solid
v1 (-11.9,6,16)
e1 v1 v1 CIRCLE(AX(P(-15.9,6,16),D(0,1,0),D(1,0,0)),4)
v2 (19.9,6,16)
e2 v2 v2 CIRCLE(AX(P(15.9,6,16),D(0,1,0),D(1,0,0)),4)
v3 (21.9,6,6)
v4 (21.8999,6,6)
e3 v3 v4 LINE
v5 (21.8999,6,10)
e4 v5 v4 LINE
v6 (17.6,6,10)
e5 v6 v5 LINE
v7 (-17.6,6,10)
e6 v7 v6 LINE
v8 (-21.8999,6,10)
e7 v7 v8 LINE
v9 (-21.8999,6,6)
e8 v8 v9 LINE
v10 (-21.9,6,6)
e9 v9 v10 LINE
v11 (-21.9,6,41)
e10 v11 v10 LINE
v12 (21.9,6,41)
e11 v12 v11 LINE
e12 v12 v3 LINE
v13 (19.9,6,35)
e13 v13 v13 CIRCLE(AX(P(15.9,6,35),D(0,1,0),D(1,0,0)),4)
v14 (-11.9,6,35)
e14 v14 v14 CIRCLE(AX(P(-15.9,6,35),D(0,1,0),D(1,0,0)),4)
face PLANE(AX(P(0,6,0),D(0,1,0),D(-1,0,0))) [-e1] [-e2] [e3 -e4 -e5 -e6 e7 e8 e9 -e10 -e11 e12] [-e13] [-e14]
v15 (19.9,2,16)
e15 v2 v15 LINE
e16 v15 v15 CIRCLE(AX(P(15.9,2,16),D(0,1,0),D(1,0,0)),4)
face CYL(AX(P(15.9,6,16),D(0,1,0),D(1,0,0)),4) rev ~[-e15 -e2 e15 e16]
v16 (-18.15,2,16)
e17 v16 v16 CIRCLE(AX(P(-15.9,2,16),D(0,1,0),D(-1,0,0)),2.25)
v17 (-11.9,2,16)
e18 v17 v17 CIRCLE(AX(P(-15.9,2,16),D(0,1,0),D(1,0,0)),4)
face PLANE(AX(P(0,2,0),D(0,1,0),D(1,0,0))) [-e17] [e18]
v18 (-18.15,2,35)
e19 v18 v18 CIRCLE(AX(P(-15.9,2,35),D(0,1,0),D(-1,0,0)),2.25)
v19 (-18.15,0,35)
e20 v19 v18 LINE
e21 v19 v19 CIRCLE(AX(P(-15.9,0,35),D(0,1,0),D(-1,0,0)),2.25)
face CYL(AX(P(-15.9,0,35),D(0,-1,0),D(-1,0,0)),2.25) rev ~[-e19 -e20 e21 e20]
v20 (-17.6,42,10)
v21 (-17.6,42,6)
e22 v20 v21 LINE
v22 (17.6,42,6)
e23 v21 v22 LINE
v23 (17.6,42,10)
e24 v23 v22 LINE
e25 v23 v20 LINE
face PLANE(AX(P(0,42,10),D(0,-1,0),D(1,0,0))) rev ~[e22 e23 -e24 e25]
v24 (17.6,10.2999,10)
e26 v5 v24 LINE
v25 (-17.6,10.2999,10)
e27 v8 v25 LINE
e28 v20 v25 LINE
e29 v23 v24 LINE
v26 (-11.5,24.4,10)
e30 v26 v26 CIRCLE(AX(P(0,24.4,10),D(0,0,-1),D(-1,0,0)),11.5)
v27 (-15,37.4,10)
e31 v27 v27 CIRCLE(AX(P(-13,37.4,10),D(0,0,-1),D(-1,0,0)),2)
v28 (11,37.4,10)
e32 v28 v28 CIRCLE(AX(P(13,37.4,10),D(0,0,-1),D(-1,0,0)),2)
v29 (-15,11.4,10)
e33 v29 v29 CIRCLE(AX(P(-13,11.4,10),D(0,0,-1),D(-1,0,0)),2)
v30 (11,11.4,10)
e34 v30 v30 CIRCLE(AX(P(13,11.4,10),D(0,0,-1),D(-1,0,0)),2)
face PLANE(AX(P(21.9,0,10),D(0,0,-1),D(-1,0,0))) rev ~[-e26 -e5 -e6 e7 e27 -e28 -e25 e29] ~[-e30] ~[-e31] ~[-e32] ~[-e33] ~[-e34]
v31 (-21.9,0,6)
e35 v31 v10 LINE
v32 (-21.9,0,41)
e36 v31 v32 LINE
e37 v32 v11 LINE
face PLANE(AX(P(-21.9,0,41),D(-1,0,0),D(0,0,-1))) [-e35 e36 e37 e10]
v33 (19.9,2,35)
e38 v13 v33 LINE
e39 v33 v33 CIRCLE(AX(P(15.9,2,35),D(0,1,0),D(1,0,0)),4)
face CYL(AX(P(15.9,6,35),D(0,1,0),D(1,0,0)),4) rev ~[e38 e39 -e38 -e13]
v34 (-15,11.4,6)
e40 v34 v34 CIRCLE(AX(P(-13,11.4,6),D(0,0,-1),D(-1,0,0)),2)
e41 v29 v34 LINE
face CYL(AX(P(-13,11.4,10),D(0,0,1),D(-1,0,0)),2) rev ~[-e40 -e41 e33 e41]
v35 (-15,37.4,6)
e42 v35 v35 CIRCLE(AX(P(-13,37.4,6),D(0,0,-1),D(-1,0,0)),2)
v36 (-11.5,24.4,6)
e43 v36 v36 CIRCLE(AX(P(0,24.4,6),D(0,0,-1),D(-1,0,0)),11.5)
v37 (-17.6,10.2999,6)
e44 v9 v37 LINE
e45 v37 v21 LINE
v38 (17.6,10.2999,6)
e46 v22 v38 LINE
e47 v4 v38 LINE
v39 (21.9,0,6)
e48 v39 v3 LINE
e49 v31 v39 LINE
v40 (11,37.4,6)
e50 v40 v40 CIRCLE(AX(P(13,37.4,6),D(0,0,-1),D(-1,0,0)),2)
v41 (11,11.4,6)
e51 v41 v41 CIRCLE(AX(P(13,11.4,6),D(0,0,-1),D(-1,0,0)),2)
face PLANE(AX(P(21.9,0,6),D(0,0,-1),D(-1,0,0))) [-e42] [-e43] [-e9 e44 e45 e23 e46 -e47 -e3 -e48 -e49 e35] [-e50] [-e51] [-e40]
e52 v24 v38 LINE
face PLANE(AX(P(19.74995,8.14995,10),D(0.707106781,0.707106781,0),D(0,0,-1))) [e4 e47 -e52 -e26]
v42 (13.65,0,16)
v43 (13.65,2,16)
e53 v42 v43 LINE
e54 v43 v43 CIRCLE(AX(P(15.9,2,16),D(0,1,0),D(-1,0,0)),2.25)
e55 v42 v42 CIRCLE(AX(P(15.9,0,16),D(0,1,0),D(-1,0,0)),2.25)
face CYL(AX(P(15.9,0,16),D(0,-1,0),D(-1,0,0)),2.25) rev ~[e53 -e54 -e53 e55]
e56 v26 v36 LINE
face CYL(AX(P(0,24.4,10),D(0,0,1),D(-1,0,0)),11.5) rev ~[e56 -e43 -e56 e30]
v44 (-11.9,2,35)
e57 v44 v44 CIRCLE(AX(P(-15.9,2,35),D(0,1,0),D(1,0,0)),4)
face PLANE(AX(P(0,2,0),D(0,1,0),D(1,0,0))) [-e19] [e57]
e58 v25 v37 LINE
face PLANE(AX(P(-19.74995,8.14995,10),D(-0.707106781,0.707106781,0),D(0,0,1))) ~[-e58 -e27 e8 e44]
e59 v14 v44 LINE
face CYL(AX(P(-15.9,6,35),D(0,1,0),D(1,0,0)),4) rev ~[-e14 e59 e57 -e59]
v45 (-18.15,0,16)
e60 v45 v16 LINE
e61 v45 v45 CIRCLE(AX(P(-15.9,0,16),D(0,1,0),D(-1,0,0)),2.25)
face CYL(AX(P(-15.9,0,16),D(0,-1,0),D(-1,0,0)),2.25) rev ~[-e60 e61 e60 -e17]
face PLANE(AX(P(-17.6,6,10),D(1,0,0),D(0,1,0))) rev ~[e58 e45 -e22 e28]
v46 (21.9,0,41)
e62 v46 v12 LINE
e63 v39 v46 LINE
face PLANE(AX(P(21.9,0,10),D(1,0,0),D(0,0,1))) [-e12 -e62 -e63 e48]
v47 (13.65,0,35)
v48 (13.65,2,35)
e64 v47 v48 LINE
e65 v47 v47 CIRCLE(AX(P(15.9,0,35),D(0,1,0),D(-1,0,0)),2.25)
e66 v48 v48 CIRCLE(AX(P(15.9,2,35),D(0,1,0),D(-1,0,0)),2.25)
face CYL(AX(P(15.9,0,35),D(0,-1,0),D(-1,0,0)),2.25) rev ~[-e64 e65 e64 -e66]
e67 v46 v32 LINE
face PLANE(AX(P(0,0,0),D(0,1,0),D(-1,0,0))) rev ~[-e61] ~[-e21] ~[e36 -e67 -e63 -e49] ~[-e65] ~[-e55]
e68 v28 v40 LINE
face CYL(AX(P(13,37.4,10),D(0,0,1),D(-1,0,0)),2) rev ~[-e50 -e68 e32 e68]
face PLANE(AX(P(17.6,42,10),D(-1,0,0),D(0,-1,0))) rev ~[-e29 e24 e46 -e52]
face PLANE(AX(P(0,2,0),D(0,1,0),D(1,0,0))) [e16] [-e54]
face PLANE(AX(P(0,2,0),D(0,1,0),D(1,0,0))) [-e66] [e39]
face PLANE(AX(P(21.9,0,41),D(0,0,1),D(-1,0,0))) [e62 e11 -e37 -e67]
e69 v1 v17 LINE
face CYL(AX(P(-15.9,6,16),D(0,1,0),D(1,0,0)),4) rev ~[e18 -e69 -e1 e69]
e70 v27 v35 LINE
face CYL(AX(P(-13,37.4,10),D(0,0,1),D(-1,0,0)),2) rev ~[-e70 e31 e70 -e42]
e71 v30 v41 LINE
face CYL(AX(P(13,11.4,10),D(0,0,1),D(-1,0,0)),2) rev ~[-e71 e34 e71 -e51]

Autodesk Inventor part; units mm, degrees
ref_plane "YZ Plane" through (0, 0, 0) normal (1, 0, 0) x (0, 1, 0)
ref_plane "XZ Plane" through (0, 0, 0) normal (0, 1, 0) x (-1, 0, 0)
ref_plane "XY Plane" through (0, 0, 0) normal (0, 0, 1) x (1, 0, 0)
sketch "Sketch1" plane through (0, 0, 0) normal (0, 1, 0) x (-1, 0, 0)
  circle A0 centre (15.9, 35) radius 2.25
  circle A1 centre (15.9, 16) radius 2.25
  circle A2 centre (-15.9, 16) radius 2.25
  circle A3 centre (-15.9, 35) radius 2.25
  line L0 (21.9, 10) -> (-21.9, 10)
  line L1 (-21.9, 10) -> (-21.9, 41)
  line L2 (-21.9, 41) -> (21.9, 41)
  line L3 (21.9, 41) -> (21.9, 10)
  point P0 (0, 0)
  point P1 (0, 0)
  dimension "d0" = 43.8
  dimension "d1" = 31
extrude "Extrusion1" add sketch "Sketch1" along normal blind 6
sketch "Sketch2" plane through (0, 6, 0) normal (0, 1, 0) x (1, 0, 0)
  circle A0 centre (-15.9, -16) radius 2.25 projected
  circle A1 centre (-15.9, -16) radius 4
  circle A2 centre (-15.9, -35) radius 2.25 projected
  circle A3 centre (-15.9, -35) radius 4
  circle A4 centre (15.9, -35) radius 2.25 projected
  circle A5 centre (15.9, -35) radius 4
  circle A6 centre (15.9, -16) radius 2.25 projected
  circle A7 centre (15.9, -16) radius 4
  point P0 (0, 0)
  dimension "d4" = 8
  dimension "d5" = 8
  dimension "d6" = 8
  dimension "d7" = 8
extrude "Extrusion2" cut sketch "Sketch2" against normal blind 4
sketch "Sketch3" plane through (21.9, 0, 10) normal (0, 0, -1) x (-1, 0, 0)
  line L0 (43.8, 0) -> (0, 0) projected
  line L1 (43.8, 0) -> (43.8, 6) projected
  line L2 (0, 6) -> (43.8, 6) projected
  line L3 (0, 0) -> (0, 6) projected
  line L4 (43.8, 6) -> (0, 6) projected
  line L5 (21.9, 6) -> (39.5, 6)
  line L6 (39.5, 6) -> (39.5, 42)
  line L7 (39.5, 42) -> (21.9, 42)
  line L8 (39.5, 42) -> (4.3, 42)
  line L9 (4.3, 42) -> (4.3, 6)
  line L10 (4.3, 6) -> (39.5, 6)
  line L11 (39.5, 6.8) -> (39.5, 42)
  circle A0 centre (34.9, 37.4) radius 2
  circle A1 centre (8.9, 37.4) radius 2
  circle A2 centre (8.9, 11.4) radius 2
  circle A3 centre (34.9, 11.4) radius 2
  circle A4 centre (21.9, 24.4) radius 11.5
  point P0 (21.9, 0)
  dimension "d16" = 4
  dimension "d19" = 360
  dimension "d21" = 23
extrude "Extrusion3" add sketch "Sketch3" along normal blind 4
chamfer "Chamfer1" distance 4.3 angle 45 1 edges at (17.6, 6, 8)
chamfer "Chamfer2" distance 4.3 angle 45 1 edges at (-17.6, 6, 8)
properties part number "NEMA14 Mounting Bracket"
